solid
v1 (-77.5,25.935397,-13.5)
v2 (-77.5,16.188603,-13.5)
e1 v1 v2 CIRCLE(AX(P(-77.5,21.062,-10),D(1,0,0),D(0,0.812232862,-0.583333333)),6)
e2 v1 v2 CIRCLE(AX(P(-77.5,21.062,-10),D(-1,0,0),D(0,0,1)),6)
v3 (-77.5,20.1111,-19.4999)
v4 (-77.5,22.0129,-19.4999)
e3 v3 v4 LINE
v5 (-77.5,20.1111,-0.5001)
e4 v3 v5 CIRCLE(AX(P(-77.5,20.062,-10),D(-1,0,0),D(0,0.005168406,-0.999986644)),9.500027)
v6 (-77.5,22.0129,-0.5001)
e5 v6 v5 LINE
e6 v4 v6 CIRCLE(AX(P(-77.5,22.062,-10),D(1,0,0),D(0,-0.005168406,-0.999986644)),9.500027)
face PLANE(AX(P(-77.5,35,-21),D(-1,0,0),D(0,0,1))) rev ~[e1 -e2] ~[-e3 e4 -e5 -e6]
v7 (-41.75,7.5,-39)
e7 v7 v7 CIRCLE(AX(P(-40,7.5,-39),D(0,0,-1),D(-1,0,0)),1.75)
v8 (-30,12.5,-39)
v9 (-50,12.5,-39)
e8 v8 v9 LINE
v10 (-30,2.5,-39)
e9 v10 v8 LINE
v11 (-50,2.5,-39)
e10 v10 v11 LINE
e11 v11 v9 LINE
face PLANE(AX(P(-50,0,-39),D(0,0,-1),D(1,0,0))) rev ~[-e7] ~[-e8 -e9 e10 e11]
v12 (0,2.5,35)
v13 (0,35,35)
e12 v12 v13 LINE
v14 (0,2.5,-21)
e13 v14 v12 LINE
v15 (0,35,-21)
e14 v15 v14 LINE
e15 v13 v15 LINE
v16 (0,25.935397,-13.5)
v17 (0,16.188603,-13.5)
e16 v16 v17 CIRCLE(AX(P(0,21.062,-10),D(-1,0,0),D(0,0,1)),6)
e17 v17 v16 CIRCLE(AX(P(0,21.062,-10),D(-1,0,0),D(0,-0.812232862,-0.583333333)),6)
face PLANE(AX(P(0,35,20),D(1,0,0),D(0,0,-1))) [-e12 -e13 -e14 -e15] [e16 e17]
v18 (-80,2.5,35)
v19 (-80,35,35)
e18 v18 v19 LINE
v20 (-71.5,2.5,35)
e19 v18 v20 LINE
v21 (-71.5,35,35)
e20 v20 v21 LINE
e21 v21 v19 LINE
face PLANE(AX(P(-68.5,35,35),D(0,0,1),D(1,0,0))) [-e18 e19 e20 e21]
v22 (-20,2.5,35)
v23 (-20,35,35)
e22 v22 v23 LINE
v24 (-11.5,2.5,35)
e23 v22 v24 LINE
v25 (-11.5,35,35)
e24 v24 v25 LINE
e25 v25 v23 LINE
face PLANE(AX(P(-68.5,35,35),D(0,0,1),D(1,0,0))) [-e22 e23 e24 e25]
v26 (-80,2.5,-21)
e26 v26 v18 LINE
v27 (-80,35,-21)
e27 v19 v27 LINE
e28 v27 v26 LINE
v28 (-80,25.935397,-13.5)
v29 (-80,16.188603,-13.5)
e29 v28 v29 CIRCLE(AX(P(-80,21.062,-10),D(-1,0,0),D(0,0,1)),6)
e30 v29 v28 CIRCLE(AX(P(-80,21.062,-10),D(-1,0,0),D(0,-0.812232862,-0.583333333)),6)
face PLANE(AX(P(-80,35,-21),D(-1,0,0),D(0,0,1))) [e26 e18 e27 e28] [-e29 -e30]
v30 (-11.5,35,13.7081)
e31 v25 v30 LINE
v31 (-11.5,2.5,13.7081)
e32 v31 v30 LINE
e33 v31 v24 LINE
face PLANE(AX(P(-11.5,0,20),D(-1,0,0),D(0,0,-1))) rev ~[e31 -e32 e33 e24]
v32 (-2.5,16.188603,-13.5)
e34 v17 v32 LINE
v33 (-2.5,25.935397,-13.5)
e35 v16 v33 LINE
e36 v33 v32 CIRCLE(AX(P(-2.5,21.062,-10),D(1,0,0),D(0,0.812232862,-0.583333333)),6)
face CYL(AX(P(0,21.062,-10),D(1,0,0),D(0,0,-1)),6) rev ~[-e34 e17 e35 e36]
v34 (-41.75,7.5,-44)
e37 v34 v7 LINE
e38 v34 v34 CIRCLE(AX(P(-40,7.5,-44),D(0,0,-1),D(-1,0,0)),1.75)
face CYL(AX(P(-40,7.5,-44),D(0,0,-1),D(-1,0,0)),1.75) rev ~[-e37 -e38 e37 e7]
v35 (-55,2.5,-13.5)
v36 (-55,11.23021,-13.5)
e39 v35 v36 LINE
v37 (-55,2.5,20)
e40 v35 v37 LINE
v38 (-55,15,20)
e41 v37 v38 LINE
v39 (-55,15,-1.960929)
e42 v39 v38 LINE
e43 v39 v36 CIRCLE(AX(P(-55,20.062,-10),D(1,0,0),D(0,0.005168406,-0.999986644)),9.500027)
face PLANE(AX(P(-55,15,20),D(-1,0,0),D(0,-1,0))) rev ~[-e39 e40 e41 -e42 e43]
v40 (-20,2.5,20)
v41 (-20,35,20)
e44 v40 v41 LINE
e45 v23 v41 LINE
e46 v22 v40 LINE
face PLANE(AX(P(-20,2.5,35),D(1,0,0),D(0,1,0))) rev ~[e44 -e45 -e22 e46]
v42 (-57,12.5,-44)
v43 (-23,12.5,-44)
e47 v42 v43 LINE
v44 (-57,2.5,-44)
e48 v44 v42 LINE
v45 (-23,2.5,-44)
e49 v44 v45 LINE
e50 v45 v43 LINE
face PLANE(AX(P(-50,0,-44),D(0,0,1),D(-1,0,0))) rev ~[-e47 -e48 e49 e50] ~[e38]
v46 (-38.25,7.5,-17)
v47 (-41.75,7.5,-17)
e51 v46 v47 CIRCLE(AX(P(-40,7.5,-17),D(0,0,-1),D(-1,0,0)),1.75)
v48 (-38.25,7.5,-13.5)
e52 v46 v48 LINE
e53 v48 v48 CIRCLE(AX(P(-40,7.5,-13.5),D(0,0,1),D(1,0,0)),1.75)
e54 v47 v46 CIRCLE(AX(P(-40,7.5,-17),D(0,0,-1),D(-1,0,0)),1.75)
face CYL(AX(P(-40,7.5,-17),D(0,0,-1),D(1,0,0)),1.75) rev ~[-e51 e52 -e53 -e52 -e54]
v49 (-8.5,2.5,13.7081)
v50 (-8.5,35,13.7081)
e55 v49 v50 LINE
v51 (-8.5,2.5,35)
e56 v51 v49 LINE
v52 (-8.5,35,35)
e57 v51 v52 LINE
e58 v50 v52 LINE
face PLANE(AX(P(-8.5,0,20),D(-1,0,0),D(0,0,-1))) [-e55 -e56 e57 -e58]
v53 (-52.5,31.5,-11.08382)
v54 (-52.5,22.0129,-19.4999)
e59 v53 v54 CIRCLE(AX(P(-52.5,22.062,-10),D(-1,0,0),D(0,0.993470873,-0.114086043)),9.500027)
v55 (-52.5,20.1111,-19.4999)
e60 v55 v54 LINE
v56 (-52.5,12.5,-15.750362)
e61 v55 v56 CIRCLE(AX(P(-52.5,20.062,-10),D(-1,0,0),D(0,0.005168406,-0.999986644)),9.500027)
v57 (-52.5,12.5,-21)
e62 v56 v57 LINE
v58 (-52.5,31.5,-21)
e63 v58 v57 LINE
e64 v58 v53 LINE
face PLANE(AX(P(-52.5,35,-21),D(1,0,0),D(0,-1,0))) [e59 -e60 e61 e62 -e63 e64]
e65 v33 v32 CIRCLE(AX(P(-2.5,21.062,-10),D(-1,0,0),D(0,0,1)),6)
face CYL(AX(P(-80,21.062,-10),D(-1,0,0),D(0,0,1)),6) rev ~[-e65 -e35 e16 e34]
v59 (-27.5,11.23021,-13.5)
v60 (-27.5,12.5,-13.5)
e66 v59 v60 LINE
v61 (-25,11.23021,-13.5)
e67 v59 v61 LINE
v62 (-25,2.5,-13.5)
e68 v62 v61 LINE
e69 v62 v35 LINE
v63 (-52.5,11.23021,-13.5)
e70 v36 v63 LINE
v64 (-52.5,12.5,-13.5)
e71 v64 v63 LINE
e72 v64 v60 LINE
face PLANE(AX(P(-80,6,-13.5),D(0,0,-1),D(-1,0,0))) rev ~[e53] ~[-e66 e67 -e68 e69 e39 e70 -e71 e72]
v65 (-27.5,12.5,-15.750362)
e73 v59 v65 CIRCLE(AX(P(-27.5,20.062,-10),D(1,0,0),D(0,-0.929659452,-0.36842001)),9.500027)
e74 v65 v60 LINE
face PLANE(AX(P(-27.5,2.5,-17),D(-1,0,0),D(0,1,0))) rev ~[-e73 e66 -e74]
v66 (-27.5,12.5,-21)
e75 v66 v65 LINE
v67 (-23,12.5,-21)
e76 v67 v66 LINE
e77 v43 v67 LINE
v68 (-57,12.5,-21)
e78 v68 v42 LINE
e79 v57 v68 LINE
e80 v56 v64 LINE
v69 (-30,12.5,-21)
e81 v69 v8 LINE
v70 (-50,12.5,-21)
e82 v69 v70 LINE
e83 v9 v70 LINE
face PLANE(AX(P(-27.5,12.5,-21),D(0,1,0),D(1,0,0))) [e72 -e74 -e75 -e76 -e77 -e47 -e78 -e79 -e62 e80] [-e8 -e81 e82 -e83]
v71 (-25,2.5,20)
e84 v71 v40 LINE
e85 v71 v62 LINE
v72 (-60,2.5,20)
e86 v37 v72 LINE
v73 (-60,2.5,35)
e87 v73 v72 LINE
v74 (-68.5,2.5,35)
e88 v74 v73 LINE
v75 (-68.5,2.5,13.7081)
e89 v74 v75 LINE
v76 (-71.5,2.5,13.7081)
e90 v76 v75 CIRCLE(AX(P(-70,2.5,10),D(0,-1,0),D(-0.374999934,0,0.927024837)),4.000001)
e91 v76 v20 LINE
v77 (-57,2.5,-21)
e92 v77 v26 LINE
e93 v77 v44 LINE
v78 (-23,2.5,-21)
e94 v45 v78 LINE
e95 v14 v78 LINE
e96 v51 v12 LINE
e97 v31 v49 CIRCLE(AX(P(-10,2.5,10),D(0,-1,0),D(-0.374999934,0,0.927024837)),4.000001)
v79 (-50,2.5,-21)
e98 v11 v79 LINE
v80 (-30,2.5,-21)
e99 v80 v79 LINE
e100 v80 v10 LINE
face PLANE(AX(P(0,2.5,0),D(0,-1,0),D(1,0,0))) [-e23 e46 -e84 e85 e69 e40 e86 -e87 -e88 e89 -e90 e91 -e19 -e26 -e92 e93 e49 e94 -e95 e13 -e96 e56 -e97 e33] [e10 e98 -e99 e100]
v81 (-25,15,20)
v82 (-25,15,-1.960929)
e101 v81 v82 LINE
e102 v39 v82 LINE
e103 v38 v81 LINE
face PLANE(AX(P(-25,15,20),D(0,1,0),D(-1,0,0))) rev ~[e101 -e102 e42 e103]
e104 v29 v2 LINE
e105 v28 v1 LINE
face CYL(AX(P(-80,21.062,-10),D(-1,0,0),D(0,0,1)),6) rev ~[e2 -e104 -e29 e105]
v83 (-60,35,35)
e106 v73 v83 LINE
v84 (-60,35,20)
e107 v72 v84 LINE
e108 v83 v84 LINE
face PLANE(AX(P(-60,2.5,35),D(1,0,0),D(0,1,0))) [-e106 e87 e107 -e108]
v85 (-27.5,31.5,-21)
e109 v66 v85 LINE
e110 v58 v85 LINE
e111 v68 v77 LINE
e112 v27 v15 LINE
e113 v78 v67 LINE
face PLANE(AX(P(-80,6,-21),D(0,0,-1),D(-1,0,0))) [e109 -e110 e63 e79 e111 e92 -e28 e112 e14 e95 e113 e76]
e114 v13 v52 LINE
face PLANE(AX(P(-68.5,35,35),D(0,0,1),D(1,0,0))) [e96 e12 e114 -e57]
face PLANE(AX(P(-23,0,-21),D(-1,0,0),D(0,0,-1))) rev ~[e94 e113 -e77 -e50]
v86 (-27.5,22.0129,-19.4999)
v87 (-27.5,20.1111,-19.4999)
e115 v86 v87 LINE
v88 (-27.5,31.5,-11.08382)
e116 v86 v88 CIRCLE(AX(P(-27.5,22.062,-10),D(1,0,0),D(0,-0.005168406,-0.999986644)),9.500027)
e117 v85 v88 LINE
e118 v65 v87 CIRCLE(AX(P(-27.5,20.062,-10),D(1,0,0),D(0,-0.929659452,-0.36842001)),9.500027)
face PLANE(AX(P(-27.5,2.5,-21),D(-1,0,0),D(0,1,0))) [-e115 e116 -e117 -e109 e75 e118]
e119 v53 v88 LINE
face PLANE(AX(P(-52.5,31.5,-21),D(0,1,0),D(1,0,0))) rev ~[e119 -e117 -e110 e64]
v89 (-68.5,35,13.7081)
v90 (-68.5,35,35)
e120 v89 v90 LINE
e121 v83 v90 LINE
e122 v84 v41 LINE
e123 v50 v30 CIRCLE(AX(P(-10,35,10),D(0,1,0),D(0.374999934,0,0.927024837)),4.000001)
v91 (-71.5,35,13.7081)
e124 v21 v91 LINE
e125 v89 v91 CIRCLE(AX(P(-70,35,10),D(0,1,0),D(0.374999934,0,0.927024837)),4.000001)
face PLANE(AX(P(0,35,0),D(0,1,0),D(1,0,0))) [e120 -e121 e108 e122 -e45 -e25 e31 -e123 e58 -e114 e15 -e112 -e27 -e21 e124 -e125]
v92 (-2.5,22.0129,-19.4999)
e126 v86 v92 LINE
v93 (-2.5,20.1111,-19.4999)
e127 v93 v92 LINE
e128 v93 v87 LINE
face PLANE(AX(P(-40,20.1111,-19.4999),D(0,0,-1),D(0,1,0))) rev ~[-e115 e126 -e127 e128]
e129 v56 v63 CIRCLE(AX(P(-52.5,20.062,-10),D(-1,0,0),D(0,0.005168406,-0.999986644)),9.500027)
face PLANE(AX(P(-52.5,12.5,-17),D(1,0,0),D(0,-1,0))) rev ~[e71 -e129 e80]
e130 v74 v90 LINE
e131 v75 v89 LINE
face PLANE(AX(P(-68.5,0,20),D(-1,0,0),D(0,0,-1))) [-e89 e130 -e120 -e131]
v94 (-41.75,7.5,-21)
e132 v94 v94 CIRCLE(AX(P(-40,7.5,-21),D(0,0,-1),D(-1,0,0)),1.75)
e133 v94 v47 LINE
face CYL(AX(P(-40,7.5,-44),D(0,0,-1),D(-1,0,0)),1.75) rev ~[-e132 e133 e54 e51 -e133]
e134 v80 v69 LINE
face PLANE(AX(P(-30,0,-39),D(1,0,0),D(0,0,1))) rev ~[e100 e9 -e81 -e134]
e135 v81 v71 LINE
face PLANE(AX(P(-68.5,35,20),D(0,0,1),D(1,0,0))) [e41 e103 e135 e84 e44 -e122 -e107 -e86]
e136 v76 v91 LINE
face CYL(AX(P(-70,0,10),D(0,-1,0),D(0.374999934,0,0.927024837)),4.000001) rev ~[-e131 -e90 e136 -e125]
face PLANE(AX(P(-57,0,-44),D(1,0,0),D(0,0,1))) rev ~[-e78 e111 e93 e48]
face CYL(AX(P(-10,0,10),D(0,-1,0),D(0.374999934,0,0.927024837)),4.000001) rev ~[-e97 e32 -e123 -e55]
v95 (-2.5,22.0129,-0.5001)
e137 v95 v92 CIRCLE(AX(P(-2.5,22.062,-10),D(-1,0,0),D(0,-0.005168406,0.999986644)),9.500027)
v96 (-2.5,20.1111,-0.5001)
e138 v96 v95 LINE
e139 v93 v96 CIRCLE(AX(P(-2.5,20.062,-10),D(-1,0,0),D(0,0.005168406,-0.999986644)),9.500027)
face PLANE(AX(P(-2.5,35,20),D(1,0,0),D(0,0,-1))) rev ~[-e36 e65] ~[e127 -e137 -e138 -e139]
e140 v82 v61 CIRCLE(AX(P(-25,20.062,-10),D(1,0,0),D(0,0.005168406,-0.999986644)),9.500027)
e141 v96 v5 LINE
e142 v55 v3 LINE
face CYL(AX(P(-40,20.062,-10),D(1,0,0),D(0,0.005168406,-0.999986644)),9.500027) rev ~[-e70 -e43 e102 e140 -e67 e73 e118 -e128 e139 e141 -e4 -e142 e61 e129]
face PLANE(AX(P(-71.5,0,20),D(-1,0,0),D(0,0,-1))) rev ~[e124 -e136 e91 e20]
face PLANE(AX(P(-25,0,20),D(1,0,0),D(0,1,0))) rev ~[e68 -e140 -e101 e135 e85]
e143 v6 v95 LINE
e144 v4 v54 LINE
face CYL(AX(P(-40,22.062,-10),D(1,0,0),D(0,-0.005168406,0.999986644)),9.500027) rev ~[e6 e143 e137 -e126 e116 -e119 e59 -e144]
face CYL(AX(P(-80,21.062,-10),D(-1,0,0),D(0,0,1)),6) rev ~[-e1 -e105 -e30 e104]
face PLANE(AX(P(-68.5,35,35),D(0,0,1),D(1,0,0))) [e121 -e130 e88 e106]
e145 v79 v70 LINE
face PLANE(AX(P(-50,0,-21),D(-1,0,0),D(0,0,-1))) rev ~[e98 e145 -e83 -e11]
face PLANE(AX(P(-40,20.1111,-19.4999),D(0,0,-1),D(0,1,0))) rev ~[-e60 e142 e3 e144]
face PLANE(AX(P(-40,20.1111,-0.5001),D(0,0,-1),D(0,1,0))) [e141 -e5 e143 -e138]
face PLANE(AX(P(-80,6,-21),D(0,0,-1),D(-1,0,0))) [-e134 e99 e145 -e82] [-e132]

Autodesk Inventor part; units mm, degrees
ref_plane "YZ Plane" through (0, 0, 0) normal (1, 0, 0) x (0, 1, 0)
ref_plane "XZ Plane" through (0, 0, 0) normal (0, 1, 0) x (-1, 0, 0)
sketch "Sketch1" plane through (0, 0, 0) normal (0, 1, 0) x (-1, 0, 0)
  arc A0 (8.5, 13.7081) -> (11.5, 13.7081) centre (10, 10) ccw
  line L0 (8.5, 20) -> (8.5, 13.7081)
  line L1 (11.5, 20) -> (11.5, 13.7081)
  line L2 (10, 20) -> (10, 18.7339)
  line L3 (20, 20) -> (10, 20)
  line L4 (8.5, 20) -> (0, 20)
  line L5 (0, 20) -> (0, 0)
  line L6 (0, 0) -> (20, 0)
  line L7 (20, 0) -> (20, 20)
  arc A1 (68.5, 13.7081) -> (71.5, 13.7081) centre (70, 10) ccw
  line L8 (68.5, 20) -> (68.5, 13.7081)
  line L9 (71.5, 20) -> (71.5, 13.7081)
  line L10 (70, 20) -> (70, 18.3732)
  line L11 (80, 20) -> (70, 20)
  line L12 (68.5, 20) -> (60.9559, 20)
  line L13 (60.9559, 20) -> (60.9559, 0)
  line L14 (60.9559, 0) -> (80, 0)
  line L15 (80, 0) -> (80, 20)
  line L16 (60.9559, 0) -> (20, 0)
  line L17 (20, 0) -> (20, 20)
  line L18 (20, 20) -> (60.9559, 20)
  line L19 (60.9559, 20) -> (60.9559, 0)
  dimension "d2" = 8
  dimension "d7" = 1.5
  dimension "d8" = 1.5
  dimension "d16" = 10
  dimension "d17" = 8
  dimension "d18" = 1.5
  dimension "d19" = 1.5
  dimension "d20" = 10
  dimension "d22" = 80
  dimension "d23" = 10
  dimension "d24" = 0
  dimension "d25" = 60
  dimension "d26" = 20
  dimension "d27" = 20
  dimension "d28" = 20
  dimension "d29" = 20
  dimension "d30" = 10
  dimension "d31" = 10
  dimension "d32" = 20
extrude "Extrusion1" add sketch "Sketch1" along normal blind 36
sketch "Sketch5" plane through (-80, 0, 0) normal (-1, 0, 0) x (0, 0, 1)
  line L0 (20, 0) -> (20, 36) projected
  line L1 (20, 36) -> (-15, 36)
  line L2 (-15, 6) -> (20, 6)
  line L3 (20, 6) -> (20, 36)
  line L4 (-15, 36) -> (-15, 29.1398)
  line L5 (-15, 12.9843) -> (-15, 6)
  line L6 (0, 0) -> (0, 36) projected
  line L7 (0, 0) -> (0, 36) projected
  line L8 (0, 6) -> (0, 36)
  arc A0 (-15, 12.9843) -> (-15, 29.1398) centre (-10, 21.062) ccw
  dimension "d40" = 30
  dimension "d41" = 35
  dimension "d45" = 20
  dimension "d85" = 19
  dimension "d86" = 5
  dimension "d87" = 15
extrude "Extrusion5" add sketch "Sketch5" against normal blind 80 contours L2 L5 A0 L4 L1 L6
sketch "Sketch13" plane through (0, 36, 0) normal (0, 1, 0) x (1, 0, 0)
  line L0 (-80, -20) -> (-80, 15) projected
  line L1 (-80, -20) -> (-71.5, -20) projected
  line L2 (-71.5, -20) -> (-71.5, -13.7081) projected
  arc A0 (-68.5, -13.7081) -> (-71.5, -13.7081) centre (-70, -10) ccw projected
  line L3 (-68.5, -13.7081) -> (-68.5, -20) projected
  line L4 (-68.5, -20) -> (-11.5, -20) projected
  line L5 (-11.5, -20) -> (-11.5, -13.7081) projected
  arc A1 (-8.5, -13.7081) -> (-11.5, -13.7081) centre (-10, -10) ccw projected
  line L6 (-8.5, -13.7081) -> (-8.5, -20) projected
  line L7 (-8.5, -20) -> (0, -20) projected
  line L8 (0, -20) -> (0, 15) projected
  line L9 (-80, 15) -> (0, 15) projected
  point P0 (0, 0)
extrude "Extrusion11" cut sketch "Sketch13" against normal blind 1
sketch "Sketch16" plane through (-80, 6, -15) normal (0, 0, -1) x (-1, 0, 0)
  line L0 (-80, -6) -> (0, -6) projected
  line L1 (0, 6.9843) -> (-80, 6.9843) projected
  line L2 (-80, -6) -> (0, -6)
  line L3 (0, -6) -> (0, 6.9843)
  line L4 (0, 6.9843) -> (-80, 6.9843)
  line L5 (-80, 6.9843) -> (-80, -6)
  line L6 (0, -6) -> (0, 29) projected
  line L7 (0, 23.1398) -> (-80, 23.1398) projected
  line L8 (0, 29) -> (-80, 29)
  line L9 (-80, 29) -> (-80, 23.1398)
  line L10 (-80, 23.1398) -> (0, 23.1398)
  line L11 (0, 23.1398) -> (0, 29)
extrude "Extrusion13" add sketch "Sketch16" along normal blind 6
sketch "Sketch17" plane through (0, 0, 0) normal (0, 0, -1) x (-1, 0, 0)
  line L0 (80, 6) -> (0, 6) projected
  line L1 (0, 0) -> (80, 0) projected
  line L2 (80, 6) -> (0, 6) projected
  line L3 (80, 6) -> (80, 0)
  line L4 (0, 6) -> (0, 0)
extrude "Extrusion14" add sketch "Sketch17" along normal blind 20
sketch "Sketch18" plane through (-68.5, 0, 20) normal (0, 0, 1) x (1, 0, 0)
  line L0 (13.5, 0) -> (43.5, 0)
  line L1 (43.5, 0) -> (43.5, 15)
  line L2 (43.5, 15) -> (13.5, 15)
  line L3 (13.5, 15) -> (13.5, 0)
  line L4 (-11.5, 0) -> (-11.5, 35) projected
  line L5 (0, 0) -> (57, 0) projected
  point P0 (68.5, 0)
  dimension "d107" = 30
  dimension "d108" = 25
  dimension "d109" = 15
  dimension "d110" = 0
extrude "Extrusion15" cut sketch "Sketch18" against normal blind 37
sketch "Sketch19" plane through (0, 0, 0) normal (0, -1, 0) x (1, 0, 0)
  line L0 (-80, -21) -> (0, -21) projected
  line L1 (-30, -21) -> (-23, -21)
  line L2 (-23, -21) -> (-23, -44)
  line L3 (-23, -44) -> (-30, -44)
  line L4 (-30, -44) -> (-30, -21)
  line L5 (-30, -44) -> (-50, -44)
  line L6 (-50, -44) -> (-50, -39)
  line L7 (-50, -39) -> (-30, -39)
  line L8 (-30, -39) -> (-30, -44)
  line L9 (-50, -44) -> (-57, -44)
  line L10 (-57, -44) -> (-57, -21)
  line L11 (-57, -21) -> (-50, -21)
  line L12 (-50, -21) -> (-50, -44)
  line L13 (0, -21) -> (0, 20) projected
  point P0 (0, 0)
  dimension "d113" = 7
  dimension "d114" = 7
  dimension "d115" = 5
  dimension "d116" = 18
  dimension "d117" = 20
  dimension "d118" = 23
extrude "Extrusion16" add sketch "Sketch19" against normal blind 15.5 contours L0 L12 L6 L9 L10 | L0 L2 L3 L4 | L7 L4 L5 L6
sketch "Sketch20" plane through (-23, 0, -44) normal (0, 0, -1) x (-1, 0, 0)
  circle A0 centre (17, 7.5) radius 1.75
  line L0 (34, 0) -> (0, 0) projected
  line L1 (-23, 12.9843) -> (-23, 0) projected
  dimension "d121" = 3.5
  dimension "d122" = 7.5
  dimension "d123" = 40
extrude "Extrusion17" cut sketch "Sketch20" against normal blind 80
sketch "Sketch21" plane through (0, 0, 0) normal (0, -1, 0) x (1, 0, 0)
  line L0 (0, -0.5) -> (-80, -0.5) projected
  line L1 (0, -21) -> (-23, -21) projected
  line L2 (0, -21) -> (0, 20) projected
  line L3 (0, 20) -> (-8.5, 20) projected
  line L4 (-8.5, 20) -> (-8.5, 13.7081) projected
  arc A0 (-11.5, 13.7081) -> (-8.5, 13.7081) centre (-10, 10) ccw projected
  line L5 (-11.5, 13.7081) -> (-11.5, 20) projected
  line L6 (-25, 20) -> (-11.5, 20) projected
  line L7 (-25, 20) -> (-25, -17) projected
  line L8 (-25, -17) -> (-55, -17) projected
  line L9 (-55, -17) -> (-55, 20) projected
  line L10 (-68.5, 20) -> (-55, 20) projected
  line L11 (-68.5, 13.7081) -> (-68.5, 20) projected
  arc A1 (-71.5, 13.7081) -> (-68.5, 13.7081) centre (-70, 10) ccw projected
  line L12 (-71.5, 20) -> (-71.5, 13.7081) projected
  line L13 (-80, 20) -> (-71.5, 20) projected
  line L14 (-80, 20) -> (-80, -21) projected
  line L15 (-57, -21) -> (-80, -21) projected
  line L16 (-57, -21) -> (-57, -44) projected
  line L17 (-57, -44) -> (-23, -44) projected
  line L18 (-23, -44) -> (-23, -21) projected
  line L19 (-30, -21) -> (-30, -39) projected
  line L20 (-30, -39) -> (-50, -39) projected
  line L21 (-50, -39) -> (-50, -21) projected
  line L22 (-30, -21) -> (-50, -21) projected
  point P0 (0, 0)
extrude "Extrusion18" cut sketch "Sketch21" against normal blind 2.5 contours L2 L1 L18 L17 L16 L15 L14 L0 L9 L8 L7 | L0 L7 L6 L5 A0 L4 L3 L2 | L0 L14 L13 L12 A1 L11 L10 L9 | L19 L20 L21 L22
ref_plane "Work Plane5" through (-40, 21.062, -10) normal (-1, 0, 0) x (0, 0, 1)
sketch "Sketch25" plane through (-80, 6, -21) normal (0, 0, -1) x (-1, 0, 0)
  line L0 (-80, 6.9843) -> (-80, -3.5) projected
  line L1 (0, 29) -> (-80, 29) projected
  line L2 (-80, -3.5) -> (-52.5, -3.5)
  line L3 (-52.5, -3.5) -> (-52.5, 29)
  line L4 (-52.5, 29) -> (-80, 29)
  line L5 (-80, 29) -> (-80, -3.5)
  line L6 (0, 23.1398) -> (0, 29) projected
  line L7 (0, 29) -> (-27.5, 29)
  line L8 (-27.5, 29) -> (-27.5, -1)
  line L9 (-27.5, -1) -> (0, -1)
  line L10 (0, -1) -> (0, 29)
  point P0 (-80, -6)
  dimension "d138" = 27.5
  dimension "d139" = 27.5
  dimension "d140" = 30
extrude "Extrusion21" add sketch "Sketch25" against normal blind 7.5
sketch "Sketch22" plane through (-40, 21.062, -10) normal (-1, 0, 0) x (0, 0, 1)
  arc A0 (-9.4999, -0.9509) -> (9.4999, -0.9509) centre (0, -1) ccw
  arc A1 (9.4999, 0.9509) -> (-9.4999, 0.9509) centre (0, 1) ccw
  line L0 (9.4999, -0.9509) -> (9.4999, 1.0491)
  line L1 (-9.4999, -0.9509) -> (-9.4999, 1.0491)
  point P0 (0, 0)
  dimension "d170" = 1
  dimension "d171" = 1
  dimension "d172" = 19
  dimension "d173" = 19
extrude "Extrusion19" cut sketch "Sketch22" along normal mid plane 75
sketch "Sketch24" plane through (-80, 6, -21) normal (0, 0, -1) x (-1, 0, 0)
  line L0 (0, 29) -> (-80, 29) projected
  line L1 (-27.5, 29) -> (-52.5, 29)
  line L2 (-52.5, 29) -> (-52.5, 4.062)
  line L3 (-52.5, 4.062) -> (-27.5, 4.062)
  line L4 (-27.5, 4.062) -> (-27.5, 29)
  line L5 (0, 23.1398) -> (0, 29) projected
  line L6 (-80, 6.9843) -> (-80, -3.5) projected
  line L7 (-52.5, 29) -> (-80, 29)
  line L8 (-80, 29) -> (-80, -3.5)
  line L9 (-80, -3.5) -> (-52.5, -3.5)
  line L10 (-52.5, -3.5) -> (-52.5, 29)
  line L11 (0, -3.5) -> (0, 6.9843) projected
  line L12 (-27.5, 29) -> (0, 29)
  line L13 (0, 29) -> (0, -3.5)
  line L14 (0, -3.5) -> (-27.5, -3.5)
  line L15 (-27.5, -3.5) -> (-27.5, 29)
  line L16 (-27.5, 25.5) -> (-52.5, 25.5)
  line L17 (-52.5, 25.5) -> (-52.5, 6.5)
  line L18 (-52.5, 6.5) -> (-27.5, 6.5)
  line L19 (-27.5, 6.5) -> (-27.5, 25.5)
  line L20 (-77.5, 25.562) -> (-2.5, 25.562) projected
  point P0 (-80, -6)
  point P1 (-52.5, 6.5)
  point P2 (-27.5, 6.5)
  point P3 (-27.5, 25.5)
  point P4 (-52.5, 25.5)
  dimension "d133" = 25
  dimension "d134" = 27.5
  dimension "d174" = 3.5
  dimension "d175" = 19
extrude "Extrusion20" cut sketch "Sketch24" against normal blind 10 contours L4 L18 L2 L16
sketch "Sketch26" plane through (0, 35, 20) normal (1, 0, 0) x (0, 0, -1)
  arc A0 (33.5, -5.1062) -> (33.5, -22.7697) centre (30, -13.938) ccw projected
  circle A1 centre (30, -13.938) radius 6
  line L0 (41, 0) -> (41, -32.5) projected
  line L1 (0, 0) -> (41, 0) projected
  line L2 (0, -32.5) -> (0, 0) projected
  line L3 (0, -32.5) -> (41, -32.5) projected
  line L4 (33.5, -22.7697) -> (33.5, -5.1062) projected
  arc A2 (33.5, -5.1062) -> (33.5, -22.7697) centre (30, -13.938) ccw projected
  point P0 (20, -35)
  point P1 (35, -8.3478)
  point P2 (35, -19.5282)
  dimension "d143" = 12
extrude "Extrusion22" add sketch "Sketch26" against normal blind 2.5 contours L4 A1 A0
sketch "Sketch27" plane through (-80, 35, -21) normal (-1, 0, 0) x (0, 0, 1)
  arc A0 (7.5, -22.7697) -> (7.5, -5.1062) centre (11, -13.938) ccw projected
  line L0 (7.5, -5.1062) -> (7.5, -22.7697) projected
  line L1 (0, -32.5) -> (0, 0) projected
  line L2 (0, -32.5) -> (41, -32.5) projected
  line L3 (41, -32.5) -> (41, 0) projected
  line L4 (41, 0) -> (0, 0) projected
  circle A1 centre (11, -13.938) radius 6
  point P0 (21, -35)
extrude "Extrusion23" add sketch "Sketch27" against normal blind 2.5 contours L0 A1 A0
sketch "Sketch28" plane through (-80, 6, -21) normal (0, 0, -1) x (-1, 0, 0)
  line L0 (-77.5, 23.062) -> (-2.5, 23.062) projected
  line L1 (-57.32, 23.062) -> (-20.6249, 23.062)
  line L2 (-20.6249, 23.062) -> (-20.6249, 8)
  line L3 (-20.6249, 8) -> (-57.32, 8)
  line L4 (-57.32, 8) -> (-57.32, 23.062)
  line L5 (-57, 9.5) -> (-23, 9.5) projected
  point P0 (-80, -6)
  dimension "d152" = 1.5
extrude "Extrusion24" cut sketch "Sketch28" along normal blind 30.5
sketch "Sketch29" plane through (-80, 35, -21) normal (-1, 0, 0) x (0, 0, 1)
  arc A0 (7.5, -18.8114) -> (7.5, -9.0646) centre (11, -13.938) ccw projected
  circle A1 centre (11, -13.938) radius 6
  point P0 (21, -35)
  point P1 (7.5, -9.0646)
  point P2 (7.5, -18.8114)
extrude "Extrusion25" cut sketch "Sketch29" against normal blind 100.5
sketch "Sketch30" plane through (-68.5, 35, 20) normal (0, 0, 1) x (1, 0, 0)
  line L0 (-11.5, -32.5) -> (-3, -32.5) projected
  line L1 (-3, -32.5) -> (-3, 0) projected
  line L2 (-3, 0) -> (-11.5, 0) projected
  line L3 (-11.5, -32.5) -> (-11.5, 0) projected
  line L4 (0, -32.5) -> (13.5, -32.5) projected
  line L5 (13.5, -32.5) -> (13.5, -20) projected
  line L6 (13.5, -20) -> (43.5, -20) projected
  line L7 (43.5, -20) -> (43.5, -32.5) projected
  line L8 (43.5, -32.5) -> (57, -32.5) projected
  line L9 (57, -32.5) -> (57, 0) projected
  line L10 (57, 0) -> (0, 0) projected
  line L11 (0, -32.5) -> (0, 0) projected
  line L12 (60, -32.5) -> (68.5, -32.5) projected
  line L13 (68.5, -32.5) -> (68.5, 0) projected
  line L14 (68.5, 0) -> (60, 0) projected
  line L15 (60, -32.5) -> (60, 0) projected
  point P0 (68.5, -35)
extrude "Extrusion26" add sketch "Sketch30" along normal blind 15
sketch "Sketch31" plane through (-68.5, 35, 35) normal (0, 0, 1) x (1, 0, 0)
  line L0 (-11.5, 0) -> (68.5, 0) projected
  line L1 (43.5, -32.5) -> (57, -32.5) projected
  line L2 (8.5, 0) -> (50.25, 0)
  line L3 (50.25, 0) -> (50.25, -32.5)
  line L4 (50.25, -32.5) -> (8.5, -32.5)
  line L5 (8.5, -32.5) -> (8.5, 0)
  line L6 (-11.5, 0) -> (-11.5, -32.5) projected
  line L7 (48.5, -32.5) -> (48.5, 0)
  line L8 (68.5, -32.5) -> (68.5, 0) projected
  point P0 (68.5, -35)
  dimension "d157" = 20
  dimension "d158" = 20
extrude "Extrusion27" cut sketch "Sketch31" against normal blind 15 contours L0 L7 L1 L4 L5
sketch "Sketch32" plane through (-68.5, 0, -17) normal (0, 0, 1) x (1, 0, 0)
  line L0 (38.5, 12.5) -> (38.5, 2.5) projected
  line L1 (16, 12.5) -> (16, 5) projected
  line L2 (16, 5) -> (13.5, 5) projected
  line L3 (13.5, 2.5) -> (13.5, 5) projected
  line L4 (13.5, 2.5) -> (41, 2.5) projected
  line L5 (41, 2.5) -> (41, 12.5) projected
  circle A0 centre (28.5, 7.5) radius 1.75 projected
  line L6 (41, 12.5) -> (16, 12.5) projected
  point P0 (68.5, 0)
  point P1 (38.5, 14)
  point P2 (38.5, 12.9843)
extrude "Extrusion28" add sketch "Sketch32" along normal up to surface (3.5 mm away)
sketch "Sketch33" plane through (-27.5, 14, -21) normal (0, 1, 0) x (1, 0, 0)
  line L0 (-2.5, 0) -> (-2.5, 18) projected
  line L1 (0, 0) -> (-2.5, 0) projected
  line L2 (4.5, 0) -> (0, 0) projected
  line L3 (4.5, 23) -> (4.5, 0) projected
  line L4 (-29.5, 23) -> (4.5, 23) projected
  line L5 (-29.5, 0) -> (-29.5, 23) projected
  line L6 (-25, 0) -> (-29.5, 0) projected
  line L7 (-22.5, 0) -> (-25, 0) projected
  line L8 (-22.5, 18) -> (-22.5, 0) projected
  line L9 (-2.5, 18) -> (-22.5, 18) projected
  point P0 (27.5, -21)
extrude "Extrusion29" cut sketch "Sketch33" against normal blind 1.5
equation "\"d2\" = RodDiameter"
equation "\"d17\" = d2"
equation "\"d85\" = XLinearBearingOD"
equation "\"d139\" = d138"
equation "\"d172\" = XLinearBearingOD"
equation "\"d173\" = XLinearBearingOD"
equation "\"d175\" = XLinearBearingOD"
equation "\"RodDiameter\" = 8"
equation "\"VerticalBearingOD\" = 16"
equation "\"PrintingClearance\" = 0.2"
equation "\"d21\" = 8"
equation "\"TubeID\" = 18"
equation "\"XLinearBearingOD\" = 19"
properties part number "GantryHolder" material "PET Plastic"
